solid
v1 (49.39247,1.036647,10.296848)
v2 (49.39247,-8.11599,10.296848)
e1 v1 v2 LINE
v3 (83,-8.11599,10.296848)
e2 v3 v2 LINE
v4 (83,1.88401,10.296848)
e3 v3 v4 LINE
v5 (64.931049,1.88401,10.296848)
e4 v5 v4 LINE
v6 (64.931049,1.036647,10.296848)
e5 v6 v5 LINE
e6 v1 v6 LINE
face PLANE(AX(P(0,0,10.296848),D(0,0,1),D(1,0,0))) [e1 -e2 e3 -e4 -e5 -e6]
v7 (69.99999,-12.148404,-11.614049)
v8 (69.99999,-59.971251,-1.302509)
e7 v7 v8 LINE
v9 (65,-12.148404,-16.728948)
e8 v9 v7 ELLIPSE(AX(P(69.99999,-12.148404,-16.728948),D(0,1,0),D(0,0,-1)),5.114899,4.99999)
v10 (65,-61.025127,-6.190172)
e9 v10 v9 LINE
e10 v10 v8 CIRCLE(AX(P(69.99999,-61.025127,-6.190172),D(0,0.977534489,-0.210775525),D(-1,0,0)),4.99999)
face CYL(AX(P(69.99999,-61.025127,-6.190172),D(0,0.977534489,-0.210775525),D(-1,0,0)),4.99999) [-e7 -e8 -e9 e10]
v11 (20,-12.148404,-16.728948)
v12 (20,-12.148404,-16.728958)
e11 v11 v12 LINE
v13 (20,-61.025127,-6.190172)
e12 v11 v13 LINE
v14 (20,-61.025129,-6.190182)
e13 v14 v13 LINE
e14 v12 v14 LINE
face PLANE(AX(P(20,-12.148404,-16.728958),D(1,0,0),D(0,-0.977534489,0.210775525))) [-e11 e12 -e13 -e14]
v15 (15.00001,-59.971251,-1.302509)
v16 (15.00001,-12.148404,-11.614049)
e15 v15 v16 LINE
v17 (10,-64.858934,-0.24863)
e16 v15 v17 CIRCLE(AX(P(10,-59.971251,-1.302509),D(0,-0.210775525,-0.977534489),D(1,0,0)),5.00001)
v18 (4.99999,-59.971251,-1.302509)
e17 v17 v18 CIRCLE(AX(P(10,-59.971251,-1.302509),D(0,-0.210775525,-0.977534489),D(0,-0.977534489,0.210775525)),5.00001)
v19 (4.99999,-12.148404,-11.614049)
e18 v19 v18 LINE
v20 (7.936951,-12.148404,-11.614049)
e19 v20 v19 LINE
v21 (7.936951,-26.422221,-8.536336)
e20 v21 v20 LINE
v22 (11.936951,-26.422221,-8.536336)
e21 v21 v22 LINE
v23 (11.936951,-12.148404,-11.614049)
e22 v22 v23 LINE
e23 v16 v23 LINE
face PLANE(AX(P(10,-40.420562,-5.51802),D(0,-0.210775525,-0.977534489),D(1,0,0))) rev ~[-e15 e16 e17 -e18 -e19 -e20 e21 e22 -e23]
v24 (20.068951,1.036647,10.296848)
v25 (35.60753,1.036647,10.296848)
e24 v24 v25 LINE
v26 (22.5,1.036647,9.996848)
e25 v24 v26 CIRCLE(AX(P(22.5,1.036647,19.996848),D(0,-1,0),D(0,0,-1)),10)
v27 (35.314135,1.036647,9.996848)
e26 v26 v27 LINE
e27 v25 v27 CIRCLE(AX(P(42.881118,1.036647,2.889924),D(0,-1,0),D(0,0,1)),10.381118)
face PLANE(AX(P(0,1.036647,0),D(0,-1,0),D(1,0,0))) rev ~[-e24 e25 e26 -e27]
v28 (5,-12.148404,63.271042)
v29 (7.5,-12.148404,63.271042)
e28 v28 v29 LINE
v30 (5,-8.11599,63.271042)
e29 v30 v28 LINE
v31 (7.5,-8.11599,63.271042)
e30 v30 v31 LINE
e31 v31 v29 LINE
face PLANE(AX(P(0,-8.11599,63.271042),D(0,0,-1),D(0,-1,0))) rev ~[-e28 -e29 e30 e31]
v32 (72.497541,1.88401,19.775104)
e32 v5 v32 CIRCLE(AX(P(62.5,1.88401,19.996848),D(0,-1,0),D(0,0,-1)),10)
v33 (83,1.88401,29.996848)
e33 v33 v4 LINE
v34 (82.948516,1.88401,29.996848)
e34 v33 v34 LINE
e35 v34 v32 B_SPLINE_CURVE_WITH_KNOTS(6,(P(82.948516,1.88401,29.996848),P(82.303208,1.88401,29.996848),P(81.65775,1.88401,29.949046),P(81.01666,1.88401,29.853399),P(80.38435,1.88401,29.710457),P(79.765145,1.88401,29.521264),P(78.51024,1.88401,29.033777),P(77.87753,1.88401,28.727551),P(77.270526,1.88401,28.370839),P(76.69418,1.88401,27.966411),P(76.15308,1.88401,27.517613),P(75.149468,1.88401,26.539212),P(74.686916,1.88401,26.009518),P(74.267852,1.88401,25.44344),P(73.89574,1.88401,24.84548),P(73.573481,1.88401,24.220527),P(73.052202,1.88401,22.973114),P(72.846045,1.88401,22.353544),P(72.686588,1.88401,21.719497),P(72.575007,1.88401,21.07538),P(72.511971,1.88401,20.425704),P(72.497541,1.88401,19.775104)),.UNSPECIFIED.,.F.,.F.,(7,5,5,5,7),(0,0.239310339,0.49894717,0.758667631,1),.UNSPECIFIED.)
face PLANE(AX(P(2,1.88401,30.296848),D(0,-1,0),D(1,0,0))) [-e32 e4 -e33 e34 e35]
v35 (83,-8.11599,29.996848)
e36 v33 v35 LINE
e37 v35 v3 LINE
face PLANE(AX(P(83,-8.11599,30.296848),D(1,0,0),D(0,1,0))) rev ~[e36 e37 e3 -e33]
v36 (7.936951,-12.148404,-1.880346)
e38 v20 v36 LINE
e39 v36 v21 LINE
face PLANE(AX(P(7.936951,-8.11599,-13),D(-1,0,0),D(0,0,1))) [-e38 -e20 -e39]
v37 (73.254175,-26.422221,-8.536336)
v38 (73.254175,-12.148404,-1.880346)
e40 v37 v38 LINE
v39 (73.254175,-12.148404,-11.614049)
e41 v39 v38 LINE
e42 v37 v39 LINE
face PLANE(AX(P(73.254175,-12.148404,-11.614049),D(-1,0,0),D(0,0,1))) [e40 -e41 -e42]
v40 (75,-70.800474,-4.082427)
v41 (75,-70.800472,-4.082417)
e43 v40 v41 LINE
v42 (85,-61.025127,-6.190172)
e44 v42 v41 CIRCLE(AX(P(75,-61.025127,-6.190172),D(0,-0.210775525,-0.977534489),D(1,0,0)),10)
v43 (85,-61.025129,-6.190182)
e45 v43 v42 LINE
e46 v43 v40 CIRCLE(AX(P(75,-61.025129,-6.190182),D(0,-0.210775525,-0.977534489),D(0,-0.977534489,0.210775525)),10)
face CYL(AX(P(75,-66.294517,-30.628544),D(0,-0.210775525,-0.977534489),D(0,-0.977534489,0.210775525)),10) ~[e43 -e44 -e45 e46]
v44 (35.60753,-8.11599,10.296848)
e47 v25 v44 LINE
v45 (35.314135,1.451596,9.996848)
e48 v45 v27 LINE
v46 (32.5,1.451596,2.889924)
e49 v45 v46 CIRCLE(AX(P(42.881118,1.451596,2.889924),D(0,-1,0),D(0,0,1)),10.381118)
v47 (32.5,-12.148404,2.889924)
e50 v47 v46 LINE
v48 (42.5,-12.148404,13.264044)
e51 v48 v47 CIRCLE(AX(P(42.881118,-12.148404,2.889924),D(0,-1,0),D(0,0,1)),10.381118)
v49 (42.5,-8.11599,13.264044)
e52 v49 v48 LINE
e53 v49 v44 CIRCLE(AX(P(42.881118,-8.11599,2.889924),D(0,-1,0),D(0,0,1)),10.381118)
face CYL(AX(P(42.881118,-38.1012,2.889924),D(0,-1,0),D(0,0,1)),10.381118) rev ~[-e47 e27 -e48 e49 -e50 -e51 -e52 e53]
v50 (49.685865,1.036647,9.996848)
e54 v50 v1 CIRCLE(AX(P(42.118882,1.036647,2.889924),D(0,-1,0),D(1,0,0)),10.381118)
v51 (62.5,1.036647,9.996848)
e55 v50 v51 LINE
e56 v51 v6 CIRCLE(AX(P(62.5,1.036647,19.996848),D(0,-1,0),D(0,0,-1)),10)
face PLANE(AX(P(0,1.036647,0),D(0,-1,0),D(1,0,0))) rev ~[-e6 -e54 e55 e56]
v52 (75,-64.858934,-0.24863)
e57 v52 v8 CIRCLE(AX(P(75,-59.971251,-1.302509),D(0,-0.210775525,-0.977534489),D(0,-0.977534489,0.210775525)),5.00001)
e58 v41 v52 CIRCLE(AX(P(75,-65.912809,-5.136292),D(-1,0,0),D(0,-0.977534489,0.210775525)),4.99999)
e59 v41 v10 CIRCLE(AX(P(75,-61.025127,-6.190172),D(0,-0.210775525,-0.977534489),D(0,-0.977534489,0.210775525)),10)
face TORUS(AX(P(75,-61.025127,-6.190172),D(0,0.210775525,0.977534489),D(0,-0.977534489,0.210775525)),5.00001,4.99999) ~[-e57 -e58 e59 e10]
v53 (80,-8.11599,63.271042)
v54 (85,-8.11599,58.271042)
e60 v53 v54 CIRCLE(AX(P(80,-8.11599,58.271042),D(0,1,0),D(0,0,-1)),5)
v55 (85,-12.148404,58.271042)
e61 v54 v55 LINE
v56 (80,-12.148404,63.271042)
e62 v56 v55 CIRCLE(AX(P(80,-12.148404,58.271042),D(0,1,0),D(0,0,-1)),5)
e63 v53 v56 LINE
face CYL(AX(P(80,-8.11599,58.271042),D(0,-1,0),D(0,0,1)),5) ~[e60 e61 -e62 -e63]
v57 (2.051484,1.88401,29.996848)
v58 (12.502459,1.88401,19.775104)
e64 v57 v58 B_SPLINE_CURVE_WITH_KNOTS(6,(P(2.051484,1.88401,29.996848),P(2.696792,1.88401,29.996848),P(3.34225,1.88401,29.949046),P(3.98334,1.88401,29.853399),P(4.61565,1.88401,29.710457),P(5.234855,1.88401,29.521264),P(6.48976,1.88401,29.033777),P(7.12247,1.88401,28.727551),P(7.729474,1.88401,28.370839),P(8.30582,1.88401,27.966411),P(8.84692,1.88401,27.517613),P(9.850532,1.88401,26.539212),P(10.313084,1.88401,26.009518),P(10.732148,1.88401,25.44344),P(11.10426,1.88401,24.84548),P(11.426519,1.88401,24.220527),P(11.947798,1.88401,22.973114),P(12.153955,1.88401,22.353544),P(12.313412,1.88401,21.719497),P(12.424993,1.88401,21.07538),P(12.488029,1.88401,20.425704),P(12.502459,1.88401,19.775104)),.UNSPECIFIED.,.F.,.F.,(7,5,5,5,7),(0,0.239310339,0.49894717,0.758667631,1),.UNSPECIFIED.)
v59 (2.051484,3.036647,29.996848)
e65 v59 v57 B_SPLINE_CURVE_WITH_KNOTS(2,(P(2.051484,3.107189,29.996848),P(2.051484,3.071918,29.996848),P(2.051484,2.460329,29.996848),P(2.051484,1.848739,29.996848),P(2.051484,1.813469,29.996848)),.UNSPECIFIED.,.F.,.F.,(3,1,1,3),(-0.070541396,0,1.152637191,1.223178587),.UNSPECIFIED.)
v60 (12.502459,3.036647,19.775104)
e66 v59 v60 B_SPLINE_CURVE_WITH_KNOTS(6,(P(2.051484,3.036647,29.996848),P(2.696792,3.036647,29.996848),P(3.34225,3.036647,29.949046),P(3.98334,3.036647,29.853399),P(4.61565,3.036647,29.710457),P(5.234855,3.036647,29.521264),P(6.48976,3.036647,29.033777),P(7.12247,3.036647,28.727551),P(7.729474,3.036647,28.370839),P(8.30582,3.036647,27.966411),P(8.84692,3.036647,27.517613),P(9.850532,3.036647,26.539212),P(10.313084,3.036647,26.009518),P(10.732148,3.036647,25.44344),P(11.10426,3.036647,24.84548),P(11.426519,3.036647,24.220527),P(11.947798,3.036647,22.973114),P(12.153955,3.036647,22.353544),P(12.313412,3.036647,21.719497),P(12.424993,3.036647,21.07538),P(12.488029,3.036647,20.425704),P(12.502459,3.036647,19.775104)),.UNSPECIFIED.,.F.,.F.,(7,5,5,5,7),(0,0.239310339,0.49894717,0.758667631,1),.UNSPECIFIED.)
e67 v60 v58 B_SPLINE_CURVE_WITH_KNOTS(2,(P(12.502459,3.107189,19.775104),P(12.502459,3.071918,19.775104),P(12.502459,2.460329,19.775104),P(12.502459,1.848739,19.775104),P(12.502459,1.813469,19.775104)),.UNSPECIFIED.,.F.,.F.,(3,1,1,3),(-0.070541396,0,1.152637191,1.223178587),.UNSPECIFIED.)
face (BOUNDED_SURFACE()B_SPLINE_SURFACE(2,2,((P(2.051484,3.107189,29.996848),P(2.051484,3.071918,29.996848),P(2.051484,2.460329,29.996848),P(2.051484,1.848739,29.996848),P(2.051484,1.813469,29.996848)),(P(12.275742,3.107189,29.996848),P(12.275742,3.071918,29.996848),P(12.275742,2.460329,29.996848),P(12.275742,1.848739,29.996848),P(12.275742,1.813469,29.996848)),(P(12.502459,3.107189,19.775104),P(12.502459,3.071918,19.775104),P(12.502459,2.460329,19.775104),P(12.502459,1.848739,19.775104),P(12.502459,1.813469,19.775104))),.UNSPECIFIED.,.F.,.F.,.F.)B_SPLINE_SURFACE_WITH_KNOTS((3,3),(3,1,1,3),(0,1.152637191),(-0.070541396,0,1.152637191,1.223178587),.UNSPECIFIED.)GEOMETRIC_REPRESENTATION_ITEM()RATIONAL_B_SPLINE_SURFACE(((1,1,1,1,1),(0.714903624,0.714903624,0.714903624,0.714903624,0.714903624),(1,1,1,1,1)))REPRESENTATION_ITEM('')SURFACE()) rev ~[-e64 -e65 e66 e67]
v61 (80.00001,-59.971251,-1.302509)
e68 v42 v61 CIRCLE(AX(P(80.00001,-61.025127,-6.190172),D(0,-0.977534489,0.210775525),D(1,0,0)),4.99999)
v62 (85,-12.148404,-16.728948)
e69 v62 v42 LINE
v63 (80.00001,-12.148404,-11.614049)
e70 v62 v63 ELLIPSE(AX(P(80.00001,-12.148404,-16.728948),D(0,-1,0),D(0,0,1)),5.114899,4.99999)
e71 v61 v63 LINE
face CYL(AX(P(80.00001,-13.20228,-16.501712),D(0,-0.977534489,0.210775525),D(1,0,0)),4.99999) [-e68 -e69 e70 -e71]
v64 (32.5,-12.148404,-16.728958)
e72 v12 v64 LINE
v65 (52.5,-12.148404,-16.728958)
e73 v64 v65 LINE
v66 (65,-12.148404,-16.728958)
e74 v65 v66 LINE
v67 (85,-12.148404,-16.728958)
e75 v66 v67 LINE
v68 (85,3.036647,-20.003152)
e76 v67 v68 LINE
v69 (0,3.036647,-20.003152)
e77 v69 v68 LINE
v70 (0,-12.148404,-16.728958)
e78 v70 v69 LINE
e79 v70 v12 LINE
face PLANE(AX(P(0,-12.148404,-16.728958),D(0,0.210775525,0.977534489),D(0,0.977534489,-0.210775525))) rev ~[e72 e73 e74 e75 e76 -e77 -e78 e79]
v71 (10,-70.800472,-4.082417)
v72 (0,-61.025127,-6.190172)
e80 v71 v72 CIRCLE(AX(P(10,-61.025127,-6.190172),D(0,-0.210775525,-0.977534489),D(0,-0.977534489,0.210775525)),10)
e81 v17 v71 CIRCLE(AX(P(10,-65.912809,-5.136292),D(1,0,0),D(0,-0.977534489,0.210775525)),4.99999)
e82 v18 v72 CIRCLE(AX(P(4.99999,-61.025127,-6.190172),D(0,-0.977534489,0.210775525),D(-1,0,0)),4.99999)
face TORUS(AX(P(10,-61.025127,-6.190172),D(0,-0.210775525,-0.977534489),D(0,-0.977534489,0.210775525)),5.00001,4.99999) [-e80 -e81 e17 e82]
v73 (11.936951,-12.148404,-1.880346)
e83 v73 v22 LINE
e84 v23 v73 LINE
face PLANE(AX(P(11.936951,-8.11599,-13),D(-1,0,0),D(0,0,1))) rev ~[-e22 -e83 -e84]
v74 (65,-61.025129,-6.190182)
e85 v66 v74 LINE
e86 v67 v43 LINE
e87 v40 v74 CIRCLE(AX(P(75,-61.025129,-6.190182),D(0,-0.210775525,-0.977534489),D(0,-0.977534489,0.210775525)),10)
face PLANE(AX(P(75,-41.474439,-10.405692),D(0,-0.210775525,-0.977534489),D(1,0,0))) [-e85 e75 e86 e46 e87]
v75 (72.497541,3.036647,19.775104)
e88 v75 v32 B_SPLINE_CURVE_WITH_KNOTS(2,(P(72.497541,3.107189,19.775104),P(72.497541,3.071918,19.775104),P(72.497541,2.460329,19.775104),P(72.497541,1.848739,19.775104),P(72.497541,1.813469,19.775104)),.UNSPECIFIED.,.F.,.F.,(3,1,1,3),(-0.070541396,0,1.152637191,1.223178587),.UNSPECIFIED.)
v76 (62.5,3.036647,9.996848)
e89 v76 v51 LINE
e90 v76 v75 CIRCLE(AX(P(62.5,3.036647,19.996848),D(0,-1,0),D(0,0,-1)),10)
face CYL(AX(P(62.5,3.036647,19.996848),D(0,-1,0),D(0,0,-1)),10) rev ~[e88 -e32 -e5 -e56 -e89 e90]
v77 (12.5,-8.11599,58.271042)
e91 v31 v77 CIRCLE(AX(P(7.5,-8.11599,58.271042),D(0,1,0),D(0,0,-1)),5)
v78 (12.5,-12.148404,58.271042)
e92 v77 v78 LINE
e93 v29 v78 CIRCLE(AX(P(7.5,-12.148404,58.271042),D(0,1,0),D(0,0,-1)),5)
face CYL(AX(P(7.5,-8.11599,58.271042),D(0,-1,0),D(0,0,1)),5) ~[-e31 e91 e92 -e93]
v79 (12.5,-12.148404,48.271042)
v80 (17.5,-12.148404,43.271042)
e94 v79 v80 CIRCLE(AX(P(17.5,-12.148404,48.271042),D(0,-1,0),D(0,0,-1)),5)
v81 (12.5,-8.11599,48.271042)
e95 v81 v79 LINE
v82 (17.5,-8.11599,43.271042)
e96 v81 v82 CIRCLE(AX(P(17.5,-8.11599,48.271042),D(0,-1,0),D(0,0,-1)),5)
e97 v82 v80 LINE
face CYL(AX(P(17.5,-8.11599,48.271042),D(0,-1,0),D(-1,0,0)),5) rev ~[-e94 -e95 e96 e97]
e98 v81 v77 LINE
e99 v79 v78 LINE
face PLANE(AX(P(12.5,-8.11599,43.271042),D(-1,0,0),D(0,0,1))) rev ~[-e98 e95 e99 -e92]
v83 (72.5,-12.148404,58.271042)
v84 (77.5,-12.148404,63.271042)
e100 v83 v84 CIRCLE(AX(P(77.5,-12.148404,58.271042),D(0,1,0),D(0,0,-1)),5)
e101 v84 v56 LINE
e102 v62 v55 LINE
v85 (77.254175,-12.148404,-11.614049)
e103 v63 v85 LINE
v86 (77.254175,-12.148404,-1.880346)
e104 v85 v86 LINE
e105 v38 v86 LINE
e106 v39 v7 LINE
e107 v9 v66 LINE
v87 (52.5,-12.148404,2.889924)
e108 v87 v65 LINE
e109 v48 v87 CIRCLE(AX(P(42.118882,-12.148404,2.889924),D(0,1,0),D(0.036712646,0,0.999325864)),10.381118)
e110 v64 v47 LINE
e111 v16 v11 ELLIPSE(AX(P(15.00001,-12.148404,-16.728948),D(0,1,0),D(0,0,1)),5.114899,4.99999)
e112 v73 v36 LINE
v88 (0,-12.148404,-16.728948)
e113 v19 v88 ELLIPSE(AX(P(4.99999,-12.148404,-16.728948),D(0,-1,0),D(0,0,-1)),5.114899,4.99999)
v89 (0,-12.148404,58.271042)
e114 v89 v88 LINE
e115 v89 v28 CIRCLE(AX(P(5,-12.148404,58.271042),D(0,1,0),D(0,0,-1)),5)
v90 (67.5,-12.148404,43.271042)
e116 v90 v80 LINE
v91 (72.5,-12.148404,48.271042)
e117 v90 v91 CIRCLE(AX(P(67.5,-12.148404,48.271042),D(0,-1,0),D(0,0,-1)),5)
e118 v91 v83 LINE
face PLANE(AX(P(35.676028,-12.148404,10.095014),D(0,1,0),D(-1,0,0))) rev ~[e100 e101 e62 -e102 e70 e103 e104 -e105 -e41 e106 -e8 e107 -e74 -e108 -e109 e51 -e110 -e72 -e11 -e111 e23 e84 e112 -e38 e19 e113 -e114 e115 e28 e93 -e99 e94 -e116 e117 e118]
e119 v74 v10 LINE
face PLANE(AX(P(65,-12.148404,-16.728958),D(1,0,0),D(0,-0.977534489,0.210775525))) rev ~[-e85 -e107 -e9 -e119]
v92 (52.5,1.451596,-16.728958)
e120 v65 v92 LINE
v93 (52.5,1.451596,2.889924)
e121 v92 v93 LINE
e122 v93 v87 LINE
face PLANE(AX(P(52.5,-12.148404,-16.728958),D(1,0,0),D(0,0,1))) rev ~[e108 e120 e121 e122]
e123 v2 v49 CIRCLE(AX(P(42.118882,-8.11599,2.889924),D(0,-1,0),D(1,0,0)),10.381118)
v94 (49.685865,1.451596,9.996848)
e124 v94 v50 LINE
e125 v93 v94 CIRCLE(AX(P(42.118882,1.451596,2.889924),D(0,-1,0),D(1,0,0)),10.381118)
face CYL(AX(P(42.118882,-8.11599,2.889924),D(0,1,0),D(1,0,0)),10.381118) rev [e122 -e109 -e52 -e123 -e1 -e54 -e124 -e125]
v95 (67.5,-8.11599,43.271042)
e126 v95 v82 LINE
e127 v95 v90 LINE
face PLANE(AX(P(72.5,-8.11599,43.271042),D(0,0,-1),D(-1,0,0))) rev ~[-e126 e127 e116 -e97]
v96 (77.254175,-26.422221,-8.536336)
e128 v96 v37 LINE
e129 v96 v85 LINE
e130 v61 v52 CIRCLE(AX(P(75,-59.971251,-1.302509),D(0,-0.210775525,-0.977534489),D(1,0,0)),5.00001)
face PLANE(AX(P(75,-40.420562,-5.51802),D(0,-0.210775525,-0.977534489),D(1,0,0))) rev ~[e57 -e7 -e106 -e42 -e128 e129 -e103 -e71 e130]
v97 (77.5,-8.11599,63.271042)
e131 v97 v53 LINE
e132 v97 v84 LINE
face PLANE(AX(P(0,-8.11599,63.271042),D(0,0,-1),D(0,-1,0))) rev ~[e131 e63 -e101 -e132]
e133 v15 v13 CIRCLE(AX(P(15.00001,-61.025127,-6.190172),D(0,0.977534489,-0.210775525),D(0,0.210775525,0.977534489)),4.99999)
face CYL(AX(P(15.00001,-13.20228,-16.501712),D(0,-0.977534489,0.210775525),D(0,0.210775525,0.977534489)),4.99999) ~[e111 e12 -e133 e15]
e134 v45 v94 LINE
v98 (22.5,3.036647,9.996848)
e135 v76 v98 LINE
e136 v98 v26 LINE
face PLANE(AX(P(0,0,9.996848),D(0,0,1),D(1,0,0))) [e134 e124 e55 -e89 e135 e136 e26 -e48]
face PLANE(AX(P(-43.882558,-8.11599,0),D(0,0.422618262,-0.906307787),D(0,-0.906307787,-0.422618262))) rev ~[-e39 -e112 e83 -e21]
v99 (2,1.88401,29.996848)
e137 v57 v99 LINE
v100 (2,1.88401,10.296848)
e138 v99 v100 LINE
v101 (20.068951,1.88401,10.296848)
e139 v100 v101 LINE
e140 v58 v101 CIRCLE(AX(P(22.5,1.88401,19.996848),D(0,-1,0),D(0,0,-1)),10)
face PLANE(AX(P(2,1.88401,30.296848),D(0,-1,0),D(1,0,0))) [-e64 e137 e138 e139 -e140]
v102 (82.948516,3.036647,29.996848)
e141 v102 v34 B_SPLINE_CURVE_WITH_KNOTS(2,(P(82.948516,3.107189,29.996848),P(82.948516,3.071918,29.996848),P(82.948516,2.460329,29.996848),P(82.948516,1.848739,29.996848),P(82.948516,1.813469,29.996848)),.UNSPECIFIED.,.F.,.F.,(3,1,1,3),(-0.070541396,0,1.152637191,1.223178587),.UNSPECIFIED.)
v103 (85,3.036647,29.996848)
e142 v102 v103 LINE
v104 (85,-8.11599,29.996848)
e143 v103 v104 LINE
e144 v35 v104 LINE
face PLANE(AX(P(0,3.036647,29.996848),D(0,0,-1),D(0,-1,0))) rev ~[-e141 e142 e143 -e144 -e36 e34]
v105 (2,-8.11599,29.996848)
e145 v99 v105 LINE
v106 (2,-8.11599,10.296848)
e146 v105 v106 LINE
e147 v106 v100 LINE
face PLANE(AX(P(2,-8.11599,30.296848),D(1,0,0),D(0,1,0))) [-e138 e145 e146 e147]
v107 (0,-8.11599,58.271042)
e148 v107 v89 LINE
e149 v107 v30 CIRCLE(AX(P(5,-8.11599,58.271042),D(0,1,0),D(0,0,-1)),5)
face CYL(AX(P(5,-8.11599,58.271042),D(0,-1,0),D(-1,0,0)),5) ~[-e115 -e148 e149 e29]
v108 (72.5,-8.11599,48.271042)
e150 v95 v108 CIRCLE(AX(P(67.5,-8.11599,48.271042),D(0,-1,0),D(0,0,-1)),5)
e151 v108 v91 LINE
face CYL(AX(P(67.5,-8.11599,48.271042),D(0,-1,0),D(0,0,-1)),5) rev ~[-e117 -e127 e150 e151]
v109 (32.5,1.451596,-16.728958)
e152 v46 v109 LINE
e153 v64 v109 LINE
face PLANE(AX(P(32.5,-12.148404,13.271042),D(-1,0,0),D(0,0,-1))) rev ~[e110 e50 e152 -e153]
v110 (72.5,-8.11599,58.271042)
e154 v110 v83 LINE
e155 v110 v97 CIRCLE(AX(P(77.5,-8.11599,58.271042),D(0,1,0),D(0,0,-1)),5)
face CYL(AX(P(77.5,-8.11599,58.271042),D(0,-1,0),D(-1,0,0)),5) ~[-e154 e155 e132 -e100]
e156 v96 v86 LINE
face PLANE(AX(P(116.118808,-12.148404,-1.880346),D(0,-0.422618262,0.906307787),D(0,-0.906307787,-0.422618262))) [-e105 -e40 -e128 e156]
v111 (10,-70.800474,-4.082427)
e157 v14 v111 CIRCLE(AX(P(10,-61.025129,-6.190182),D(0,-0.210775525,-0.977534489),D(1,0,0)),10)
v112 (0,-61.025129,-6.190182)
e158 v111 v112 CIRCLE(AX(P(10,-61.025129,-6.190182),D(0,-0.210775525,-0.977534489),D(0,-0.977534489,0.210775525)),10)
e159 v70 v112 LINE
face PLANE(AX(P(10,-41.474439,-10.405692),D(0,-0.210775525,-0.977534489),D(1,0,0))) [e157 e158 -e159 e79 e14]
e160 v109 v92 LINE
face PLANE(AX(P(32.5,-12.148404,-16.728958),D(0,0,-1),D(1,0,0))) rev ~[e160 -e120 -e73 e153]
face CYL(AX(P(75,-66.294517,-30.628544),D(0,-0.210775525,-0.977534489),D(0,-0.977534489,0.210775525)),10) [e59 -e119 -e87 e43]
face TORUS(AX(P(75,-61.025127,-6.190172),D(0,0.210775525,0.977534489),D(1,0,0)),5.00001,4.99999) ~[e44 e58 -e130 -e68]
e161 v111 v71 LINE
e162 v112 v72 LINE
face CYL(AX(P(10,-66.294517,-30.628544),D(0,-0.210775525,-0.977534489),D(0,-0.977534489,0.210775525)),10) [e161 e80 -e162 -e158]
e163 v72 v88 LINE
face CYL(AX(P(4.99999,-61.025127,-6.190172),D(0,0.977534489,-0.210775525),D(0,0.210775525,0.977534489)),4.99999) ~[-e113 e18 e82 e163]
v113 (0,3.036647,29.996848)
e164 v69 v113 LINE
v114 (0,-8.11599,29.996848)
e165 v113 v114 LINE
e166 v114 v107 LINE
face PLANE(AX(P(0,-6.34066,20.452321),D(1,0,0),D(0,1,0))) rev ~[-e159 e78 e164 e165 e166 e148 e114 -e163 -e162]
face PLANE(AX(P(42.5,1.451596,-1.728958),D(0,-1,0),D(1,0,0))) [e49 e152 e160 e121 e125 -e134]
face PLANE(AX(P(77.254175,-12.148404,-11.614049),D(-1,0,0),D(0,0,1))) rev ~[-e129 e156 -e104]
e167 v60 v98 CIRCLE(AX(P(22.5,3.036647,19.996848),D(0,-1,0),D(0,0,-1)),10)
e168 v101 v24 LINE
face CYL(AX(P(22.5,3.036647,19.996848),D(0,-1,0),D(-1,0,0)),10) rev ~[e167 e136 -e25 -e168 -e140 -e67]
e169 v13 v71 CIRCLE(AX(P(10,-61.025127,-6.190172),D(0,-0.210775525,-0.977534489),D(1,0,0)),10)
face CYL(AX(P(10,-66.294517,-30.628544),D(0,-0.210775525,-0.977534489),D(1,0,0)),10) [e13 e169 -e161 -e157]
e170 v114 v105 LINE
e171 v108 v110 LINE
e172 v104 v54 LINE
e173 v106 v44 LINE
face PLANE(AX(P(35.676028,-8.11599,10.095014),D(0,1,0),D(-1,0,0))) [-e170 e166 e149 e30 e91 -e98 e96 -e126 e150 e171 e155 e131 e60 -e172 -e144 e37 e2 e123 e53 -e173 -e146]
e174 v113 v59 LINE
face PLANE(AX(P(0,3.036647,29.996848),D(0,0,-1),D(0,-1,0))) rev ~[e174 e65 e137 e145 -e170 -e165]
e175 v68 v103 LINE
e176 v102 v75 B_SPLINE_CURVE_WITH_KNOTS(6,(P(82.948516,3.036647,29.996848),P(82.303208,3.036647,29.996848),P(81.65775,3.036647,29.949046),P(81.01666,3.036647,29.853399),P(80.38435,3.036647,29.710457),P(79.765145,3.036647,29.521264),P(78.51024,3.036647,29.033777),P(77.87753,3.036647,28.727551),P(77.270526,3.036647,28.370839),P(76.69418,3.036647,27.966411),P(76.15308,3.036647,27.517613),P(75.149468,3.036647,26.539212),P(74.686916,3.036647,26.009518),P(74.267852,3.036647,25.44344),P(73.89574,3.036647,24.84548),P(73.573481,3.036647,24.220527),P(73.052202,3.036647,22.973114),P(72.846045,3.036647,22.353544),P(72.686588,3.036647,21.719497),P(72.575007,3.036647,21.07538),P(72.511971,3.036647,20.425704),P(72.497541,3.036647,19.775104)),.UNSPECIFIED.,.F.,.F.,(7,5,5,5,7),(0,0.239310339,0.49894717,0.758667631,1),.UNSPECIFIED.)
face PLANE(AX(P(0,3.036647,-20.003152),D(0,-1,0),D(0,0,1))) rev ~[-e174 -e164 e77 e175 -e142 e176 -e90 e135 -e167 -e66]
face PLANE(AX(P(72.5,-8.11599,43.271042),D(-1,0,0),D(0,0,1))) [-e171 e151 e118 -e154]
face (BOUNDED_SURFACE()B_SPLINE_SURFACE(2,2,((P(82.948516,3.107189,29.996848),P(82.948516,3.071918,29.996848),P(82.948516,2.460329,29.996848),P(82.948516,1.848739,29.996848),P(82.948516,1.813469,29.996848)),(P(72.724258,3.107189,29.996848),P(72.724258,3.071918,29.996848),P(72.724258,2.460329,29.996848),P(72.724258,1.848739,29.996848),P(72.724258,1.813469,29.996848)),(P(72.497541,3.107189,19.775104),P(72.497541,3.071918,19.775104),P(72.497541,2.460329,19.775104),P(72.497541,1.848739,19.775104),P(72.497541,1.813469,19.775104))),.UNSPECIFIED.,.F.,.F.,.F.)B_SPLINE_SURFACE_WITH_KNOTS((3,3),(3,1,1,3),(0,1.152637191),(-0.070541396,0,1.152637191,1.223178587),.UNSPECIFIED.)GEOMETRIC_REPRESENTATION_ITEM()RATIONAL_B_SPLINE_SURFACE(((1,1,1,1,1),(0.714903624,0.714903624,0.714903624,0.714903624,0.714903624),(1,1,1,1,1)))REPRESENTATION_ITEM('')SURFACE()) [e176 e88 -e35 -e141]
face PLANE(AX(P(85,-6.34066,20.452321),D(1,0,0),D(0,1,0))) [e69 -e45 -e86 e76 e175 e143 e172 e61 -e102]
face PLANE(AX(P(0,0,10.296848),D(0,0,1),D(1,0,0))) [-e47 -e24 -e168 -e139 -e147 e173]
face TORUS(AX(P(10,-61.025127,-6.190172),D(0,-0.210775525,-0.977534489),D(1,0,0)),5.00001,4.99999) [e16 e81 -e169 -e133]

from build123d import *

# Parameters (mm, degrees)
F1_DEPTH      = 85
F3_W          = 81
F3_H          = 10
F4_DEPTH      = 20
F7_DEPTH      = 13.6
F9_W          = 60
F9_H          = 20
F10_DEPTH     = 2
F12_W         = 20
F12_H         = 60
F13_DEPTH     = 5
F14_T1_DEPTH  = 55
F15_R         = 4.99999
F16_R         = 10
F18_W         = 60
F18_H         = 20
F19_DEPTH     = 4.5
F20_R         = 5
F21_R         = 10.4535447251
F22_W         = 4
F22_H         = 13
F23_DEPTH     = 20
F24_T4_DEPTH  = 107.6390188569
F25_W         = 4
F25_H         = 9.7337032971
F26_DEPTH     = 15
F27_T4_DEPTH  = 81.7292641427
F28_T1_DEPTH  = 4.0324145269
F28_T6_DEPTH  = 55.9380061179
F28_T13_DEPTH = 55.9380061179
F28_T20_DEPTH = 29.9852103224
F28_T26_DEPTH = 55.9380061179


# Not quite as in the source:
# - a fillet or chamfer that OpenCascade refuses, or shapes differently, is made with other operations: its cross-section is extruded or revolved along the edge and cut away or added
# - a fillet or chamfer is up to 0.001 mm smaller than in the source, because OpenCascade refuses the exact size


with BuildPart() as f1:
    # F0 (on Right) → F1 (new body)
    with BuildSketch(Plane.YZ):
        Polygon((-12.1484044939, 63.271041885), (-12.1484044939, -16.728958115), (3.0366472241, -20.0031517962), (3.0366472241, 29.9968482038), (-8.115989967, 29.9968482038), (-8.115989967, 63.271041885), align=None)
    extrude(amount=F1_DEPTH)

    # F3 (on offset) → F4 (cut)
    with BuildSketch(Plane.XY.offset(30.2968482038)):
        with Locations((42.5, -3.115989967)):
            Rectangle(F3_W, F3_H)
    extrude(amount=-F4_DEPTH, mode=Mode.SUBTRACT)

    # F6 (on offset) → F7 (cut)
    with BuildSketch(Plane.XZ.offset(12.1484044939)):
        Polygon((32.5, -16.728958115), (42.5, -16.728958115), (52.5, -16.728958115), (52.5, 13.271041885), (42.5, 13.271041885), (32.5, 13.271041885), align=None)
    extrude(amount=-F7_DEPTH, mode=Mode.SUBTRACT)

    # F9 (on offset) → F10 (cut)
    with BuildSketch(Plane(origin=(0, 3.0366472241, 0), x_dir=(-1, 0, 0), z_dir=(0, 1, 0))):
        with Locations((-42.5, 19.9968482038)):
            Rectangle(F9_W, F9_H)
    extrude(amount=-F10_DEPTH, mode=Mode.SUBTRACT)

    # F12 (on offset) → F13 (join)
    with BuildSketch(Plane(origin=(0, -3.986549235, -18.488813492), x_dir=(1, 0, 0), z_dir=(0, -0.210775525, -0.9775344894))):
        with Locations((75, 38.3494294545)):
            Rectangle(F12_W, F12_H)
        with Locations((10, 38.3494294545)):
            Rectangle(F12_W, F12_H)
    extrude(amount=-F13_DEPTH)

    # F14: fillet of radius 10 on 4 edges, made by hand

    # F14_s2 → F14_t1 (cut)
    with BuildSketch(Plane(origin=(0, -9.2559373608, -42.927175728), x_dir=(1, 0, 0), z_dir=(0, 0.210775525, 0.9775344894))):
        with BuildLine():
            ThreePointArc((75, -68.3494294545), (67.9289321881, -65.4204972664), (65, -58.3494294545))
            Line((65, -58.3494294545), (65, -68.3494294545))
            Line((65, -68.3494294545), (75, -68.3494294545))
        make_face()
        with BuildLine():
            ThreePointArc((10, -68.3494294545), (2.9289321881, -65.4204972664), (0, -58.3494294545))
            Line((0, -58.3494294545), (0, -68.3494294545))
            Line((0, -68.3494294545), (10, -68.3494294545))
        make_face()
        with BuildLine():
            ThreePointArc((20, -58.3494294545), (17.0710678119, -65.4204972664), (10, -68.3494294545))
            Line((10, -68.3494294545), (20, -68.3494294545))
            Line((20, -68.3494294545), (20, -58.3494294545))
        make_face()
        with BuildLine():
            ThreePointArc((75, -68.3494294545), (82.0710678119, -65.4204972664), (85, -58.3494294545))
            Line((85, -58.3494294545), (85, -68.3494294545))
            Line((85, -68.3494294545), (75, -68.3494294545))
        make_face()
    extrude(amount=F14_T1_DEPTH, mode=Mode.SUBTRACT)

    # F15 (radius 5 in the source; OpenCascade refuses exactly that, so slightly less here)
    f15_edges = [f1.edges().sort_by_distance(p)[0] for p in [
        (85, -36.059828, -6.458279),
        (20, -36.059828, -6.458279),
    ]]
    fillet(f15_edges, radius=F15_R)

    # F16
    f16_edges = [f1.edges().sort_by_distance(p)[0] for p in [
        (12.5, 2.036647, 9.996848),
        (72.5, 2.036647, 9.996848),
    ]]
    fillet(f16_edges, radius=F16_R)

    # F18 (on offset) → F19 (cut)
    with BuildSketch(Plane(origin=(0, -8.115989967, 0), x_dir=(-1, 0, 0), z_dir=(0, 1, 0))):
        with Locations((-42.5, 53.271041885)):
            Rectangle(F18_W, F18_H)
    extrude(amount=-F19_DEPTH, mode=Mode.SUBTRACT)

    # F20
    f20_edges = [f1.edges().sort_by_distance(p)[0] for p in [
        (72.5, -10.132197, 63.271042),
        (85, -10.132197, 63.271042),
        (72.5, -10.132197, 43.271042),
        (12.5, -10.132197, 43.271042),
        (12.5, -10.132197, 63.271042),
        (0, -10.132197, 63.271042),
    ]]
    fillet(f20_edges, radius=F20_R)

    # F21
    f21_edges = [f1.edges().sort_by_distance(p)[0] for p in [
        (72.5, 2.460329, 29.996848),
        (12.5, 2.460329, 29.996848),
    ]]
    fillet(f21_edges, radius=F21_R)

    # F22 (on offset) → F23 (join)
    with BuildSketch(Plane(origin=(0, -8.115989967, 0), x_dir=(-1, 0, 0), z_dir=(0, 1, 0))):
        with Locations((-9.9369510557, -6.5)):
            Rectangle(F22_W, F22_H)
    extrude(amount=-F23_DEPTH)

    # F24: chamfer of 20 x 9.3261531631 on 1 edges, made by hand


with BuildPart() as f24_tool2:
    # F24_s3 → F24_t4 (new body)
    with BuildSketch(Plane.YZ.offset(-43.8825583727)):
        Polygon((-8.115989967, 0), (-28.115989967, -9.3261531631), (-28.115989967, 0), align=None)
    extrude(amount=F24_T4_DEPTH)

    split(bisect_by=Plane.XZ.offset(12.1484044939), keep=Keep.TOP)

    split(bisect_by=Plane(origin=(0, -2.9326716098, -13.6011410448), x_dir=(1, 0, 0), z_dir=(0, 0.210775525, 0.9775344894)), keep=Keep.TOP)


with BuildPart() as f1_1:
    add(f1.part)

    # F24_t1: cut F24_tool2
    add(f24_tool2.part, mode=Mode.SUBTRACT)

    # F25 (on face) → F26 (join)
    with BuildSketch(Plane.XZ.offset(12.1484044939)):
        with Locations((75.2541754842, -6.7471974233)):
            Rectangle(F25_W, F25_H)
    extrude(amount=F26_DEPTH)

    # F27: chamfer of 15 x 6.9946148723 on 1 edges, made by hand


with BuildPart() as f27_tool2:
    # F27_s3 → F27_t4 (new body)
    with BuildSketch(Plane.YZ.offset(116.1188075555)):
        Polygon((-12.1484044939, -1.8803457748), (-27.1484044939, -8.8749606471), (-27.1484044939, -1.8803457748), align=None)
    extrude(amount=-F27_T4_DEPTH)

    split(bisect_by=Plane.XZ.offset(12.1484044939), keep=Keep.TOP)

    split(bisect_by=Plane(origin=(0, -2.9326716098, -13.6011410448), x_dir=(1, 0, 0), z_dir=(0, 0.210775525, 0.9775344894)), keep=Keep.TOP)


with BuildPart() as f1_2:
    add(f1_1.part)

    # F27_t1: cut F27_tool2
    add(f27_tool2.part, mode=Mode.SUBTRACT)

    # F28: fillet of radius 10.3811183182 on 2 edges, made by hand

    # F28_s2 → F28_t1 (join)
    with BuildSketch(Plane.XZ.offset(8.115989967)):
        with BuildLine():
            ThreePointArc((42.8811183182, 13.271041885), (35.5405591591, 10.2304827259), (32.5, 2.8899235668))
            Line((32.5, 2.8899235668), (32.5, 13.271041885))
            Line((32.5, 13.271041885), (42.8811183182, 13.271041885))
        make_face()
        with BuildLine():
            ThreePointArc((52.5, 2.8899235668), (49.4594408409, 10.2304827259), (42.1188816818, 13.271041885))
            Line((42.1188816818, 13.271041885), (52.5, 13.271041885))
            Line((52.5, 13.271041885), (52.5, 2.8899235668))
        make_face()
    extrude(amount=F28_T1_DEPTH)


with BuildPart() as f28_tool4:
    # F28_s5 → F28_t6 (new body)
    with BuildSketch(Plane.XZ.offset(38.1012002894)):
        with BuildLine():
            ThreePointArc((42.8811183182, 13.271041885), (35.5405591591, 10.2304827259), (32.5, 2.8899235668))
            Line((32.5, 2.8899235668), (32.5, 13.271041885))
            Line((32.5, 13.271041885), (42.8811183182, 13.271041885))
        make_face()
    extrude(amount=-F28_T6_DEPTH)

    split(bisect_by=Plane.XZ.offset(-1.0366472241), keep=Keep.TOP)

    split(bisect_by=Plane.XY.offset(10.2968482038), keep=Keep.BOTTOM)

    split(bisect_by=Plane.XZ.offset(8.115989967), keep=Keep.BOTTOM)


with BuildPart() as f1_3:
    add(f1_2.part)

    # F28_t3: union F28_tool4
    add(f28_tool4.part)


with BuildPart() as f28_tool11:
    # F28_s12 → F28_t13 (new body)
    with BuildSketch(Plane.XZ.offset(38.1012002894)):
        with BuildLine():
            ThreePointArc((42.8811183182, 13.271041885), (35.5405591591, 10.2304827259), (32.5, 2.8899235668))
            Line((32.5, 2.8899235668), (32.5, 13.271041885))
            Line((32.5, 13.271041885), (42.8811183182, 13.271041885))
        make_face()
    extrude(amount=-F28_T13_DEPTH)

    split(bisect_by=Plane.XY.offset(9.9968482038), keep=Keep.BOTTOM)

    split(bisect_by=Plane.XZ.offset(8.115989967), keep=Keep.BOTTOM)

    split(bisect_by=Plane.XZ.offset(-3.0366472241), keep=Keep.TOP)


with BuildPart() as f1_4:
    add(f1_3.part)

    # F28_t10: union F28_tool11
    add(f28_tool11.part)


with BuildPart() as f28_tool18:
    # F28_s19 → F28_t20 (new body)
    with BuildSketch(Plane.XZ.offset(12.1484044939)):
        with BuildLine():
            ThreePointArc((52.5, 2.8899235668), (49.4594408409, 10.2304827259), (42.1188816818, 13.271041885))
            Line((42.1188816818, 13.271041885), (52.5, 13.271041885))
            Line((52.5, 13.271041885), (52.5, 2.8899235668))
        make_face()
    extrude(amount=-F28_T20_DEPTH)

    split(bisect_by=Plane.XY.offset(10.2968482038), keep=Keep.BOTTOM)

    split(bisect_by=Plane.XZ.offset(-1.0366472241), keep=Keep.TOP)


with BuildPart() as f1_5:
    add(f1_4.part)

    # F28_t17: union F28_tool18
    add(f28_tool18.part)


with BuildPart() as f28_tool24:
    # F28_s25 → F28_t26 (new body)
    with BuildSketch(Plane.XZ.offset(38.1012002894)):
        with BuildLine():
            ThreePointArc((52.5, 2.8899235668), (49.4594408409, 10.2304827259), (42.1188816818, 13.271041885))
            Line((42.1188816818, 13.271041885), (52.5, 13.271041885))
            Line((52.5, 13.271041885), (52.5, 2.8899235668))
        make_face()
    extrude(amount=-F28_T26_DEPTH)

    split(bisect_by=Plane.XY.offset(9.9968482038), keep=Keep.BOTTOM)

    split(bisect_by=Plane.XZ.offset(8.115989967), keep=Keep.BOTTOM)

    split(bisect_by=Plane.XZ.offset(-3.0366472241), keep=Keep.TOP)


with BuildPart() as f1_6:
    add(f1_5.part)

    # F28_t23: union F28_tool24
    add(f28_tool24.part)


solid = f1_6.part
